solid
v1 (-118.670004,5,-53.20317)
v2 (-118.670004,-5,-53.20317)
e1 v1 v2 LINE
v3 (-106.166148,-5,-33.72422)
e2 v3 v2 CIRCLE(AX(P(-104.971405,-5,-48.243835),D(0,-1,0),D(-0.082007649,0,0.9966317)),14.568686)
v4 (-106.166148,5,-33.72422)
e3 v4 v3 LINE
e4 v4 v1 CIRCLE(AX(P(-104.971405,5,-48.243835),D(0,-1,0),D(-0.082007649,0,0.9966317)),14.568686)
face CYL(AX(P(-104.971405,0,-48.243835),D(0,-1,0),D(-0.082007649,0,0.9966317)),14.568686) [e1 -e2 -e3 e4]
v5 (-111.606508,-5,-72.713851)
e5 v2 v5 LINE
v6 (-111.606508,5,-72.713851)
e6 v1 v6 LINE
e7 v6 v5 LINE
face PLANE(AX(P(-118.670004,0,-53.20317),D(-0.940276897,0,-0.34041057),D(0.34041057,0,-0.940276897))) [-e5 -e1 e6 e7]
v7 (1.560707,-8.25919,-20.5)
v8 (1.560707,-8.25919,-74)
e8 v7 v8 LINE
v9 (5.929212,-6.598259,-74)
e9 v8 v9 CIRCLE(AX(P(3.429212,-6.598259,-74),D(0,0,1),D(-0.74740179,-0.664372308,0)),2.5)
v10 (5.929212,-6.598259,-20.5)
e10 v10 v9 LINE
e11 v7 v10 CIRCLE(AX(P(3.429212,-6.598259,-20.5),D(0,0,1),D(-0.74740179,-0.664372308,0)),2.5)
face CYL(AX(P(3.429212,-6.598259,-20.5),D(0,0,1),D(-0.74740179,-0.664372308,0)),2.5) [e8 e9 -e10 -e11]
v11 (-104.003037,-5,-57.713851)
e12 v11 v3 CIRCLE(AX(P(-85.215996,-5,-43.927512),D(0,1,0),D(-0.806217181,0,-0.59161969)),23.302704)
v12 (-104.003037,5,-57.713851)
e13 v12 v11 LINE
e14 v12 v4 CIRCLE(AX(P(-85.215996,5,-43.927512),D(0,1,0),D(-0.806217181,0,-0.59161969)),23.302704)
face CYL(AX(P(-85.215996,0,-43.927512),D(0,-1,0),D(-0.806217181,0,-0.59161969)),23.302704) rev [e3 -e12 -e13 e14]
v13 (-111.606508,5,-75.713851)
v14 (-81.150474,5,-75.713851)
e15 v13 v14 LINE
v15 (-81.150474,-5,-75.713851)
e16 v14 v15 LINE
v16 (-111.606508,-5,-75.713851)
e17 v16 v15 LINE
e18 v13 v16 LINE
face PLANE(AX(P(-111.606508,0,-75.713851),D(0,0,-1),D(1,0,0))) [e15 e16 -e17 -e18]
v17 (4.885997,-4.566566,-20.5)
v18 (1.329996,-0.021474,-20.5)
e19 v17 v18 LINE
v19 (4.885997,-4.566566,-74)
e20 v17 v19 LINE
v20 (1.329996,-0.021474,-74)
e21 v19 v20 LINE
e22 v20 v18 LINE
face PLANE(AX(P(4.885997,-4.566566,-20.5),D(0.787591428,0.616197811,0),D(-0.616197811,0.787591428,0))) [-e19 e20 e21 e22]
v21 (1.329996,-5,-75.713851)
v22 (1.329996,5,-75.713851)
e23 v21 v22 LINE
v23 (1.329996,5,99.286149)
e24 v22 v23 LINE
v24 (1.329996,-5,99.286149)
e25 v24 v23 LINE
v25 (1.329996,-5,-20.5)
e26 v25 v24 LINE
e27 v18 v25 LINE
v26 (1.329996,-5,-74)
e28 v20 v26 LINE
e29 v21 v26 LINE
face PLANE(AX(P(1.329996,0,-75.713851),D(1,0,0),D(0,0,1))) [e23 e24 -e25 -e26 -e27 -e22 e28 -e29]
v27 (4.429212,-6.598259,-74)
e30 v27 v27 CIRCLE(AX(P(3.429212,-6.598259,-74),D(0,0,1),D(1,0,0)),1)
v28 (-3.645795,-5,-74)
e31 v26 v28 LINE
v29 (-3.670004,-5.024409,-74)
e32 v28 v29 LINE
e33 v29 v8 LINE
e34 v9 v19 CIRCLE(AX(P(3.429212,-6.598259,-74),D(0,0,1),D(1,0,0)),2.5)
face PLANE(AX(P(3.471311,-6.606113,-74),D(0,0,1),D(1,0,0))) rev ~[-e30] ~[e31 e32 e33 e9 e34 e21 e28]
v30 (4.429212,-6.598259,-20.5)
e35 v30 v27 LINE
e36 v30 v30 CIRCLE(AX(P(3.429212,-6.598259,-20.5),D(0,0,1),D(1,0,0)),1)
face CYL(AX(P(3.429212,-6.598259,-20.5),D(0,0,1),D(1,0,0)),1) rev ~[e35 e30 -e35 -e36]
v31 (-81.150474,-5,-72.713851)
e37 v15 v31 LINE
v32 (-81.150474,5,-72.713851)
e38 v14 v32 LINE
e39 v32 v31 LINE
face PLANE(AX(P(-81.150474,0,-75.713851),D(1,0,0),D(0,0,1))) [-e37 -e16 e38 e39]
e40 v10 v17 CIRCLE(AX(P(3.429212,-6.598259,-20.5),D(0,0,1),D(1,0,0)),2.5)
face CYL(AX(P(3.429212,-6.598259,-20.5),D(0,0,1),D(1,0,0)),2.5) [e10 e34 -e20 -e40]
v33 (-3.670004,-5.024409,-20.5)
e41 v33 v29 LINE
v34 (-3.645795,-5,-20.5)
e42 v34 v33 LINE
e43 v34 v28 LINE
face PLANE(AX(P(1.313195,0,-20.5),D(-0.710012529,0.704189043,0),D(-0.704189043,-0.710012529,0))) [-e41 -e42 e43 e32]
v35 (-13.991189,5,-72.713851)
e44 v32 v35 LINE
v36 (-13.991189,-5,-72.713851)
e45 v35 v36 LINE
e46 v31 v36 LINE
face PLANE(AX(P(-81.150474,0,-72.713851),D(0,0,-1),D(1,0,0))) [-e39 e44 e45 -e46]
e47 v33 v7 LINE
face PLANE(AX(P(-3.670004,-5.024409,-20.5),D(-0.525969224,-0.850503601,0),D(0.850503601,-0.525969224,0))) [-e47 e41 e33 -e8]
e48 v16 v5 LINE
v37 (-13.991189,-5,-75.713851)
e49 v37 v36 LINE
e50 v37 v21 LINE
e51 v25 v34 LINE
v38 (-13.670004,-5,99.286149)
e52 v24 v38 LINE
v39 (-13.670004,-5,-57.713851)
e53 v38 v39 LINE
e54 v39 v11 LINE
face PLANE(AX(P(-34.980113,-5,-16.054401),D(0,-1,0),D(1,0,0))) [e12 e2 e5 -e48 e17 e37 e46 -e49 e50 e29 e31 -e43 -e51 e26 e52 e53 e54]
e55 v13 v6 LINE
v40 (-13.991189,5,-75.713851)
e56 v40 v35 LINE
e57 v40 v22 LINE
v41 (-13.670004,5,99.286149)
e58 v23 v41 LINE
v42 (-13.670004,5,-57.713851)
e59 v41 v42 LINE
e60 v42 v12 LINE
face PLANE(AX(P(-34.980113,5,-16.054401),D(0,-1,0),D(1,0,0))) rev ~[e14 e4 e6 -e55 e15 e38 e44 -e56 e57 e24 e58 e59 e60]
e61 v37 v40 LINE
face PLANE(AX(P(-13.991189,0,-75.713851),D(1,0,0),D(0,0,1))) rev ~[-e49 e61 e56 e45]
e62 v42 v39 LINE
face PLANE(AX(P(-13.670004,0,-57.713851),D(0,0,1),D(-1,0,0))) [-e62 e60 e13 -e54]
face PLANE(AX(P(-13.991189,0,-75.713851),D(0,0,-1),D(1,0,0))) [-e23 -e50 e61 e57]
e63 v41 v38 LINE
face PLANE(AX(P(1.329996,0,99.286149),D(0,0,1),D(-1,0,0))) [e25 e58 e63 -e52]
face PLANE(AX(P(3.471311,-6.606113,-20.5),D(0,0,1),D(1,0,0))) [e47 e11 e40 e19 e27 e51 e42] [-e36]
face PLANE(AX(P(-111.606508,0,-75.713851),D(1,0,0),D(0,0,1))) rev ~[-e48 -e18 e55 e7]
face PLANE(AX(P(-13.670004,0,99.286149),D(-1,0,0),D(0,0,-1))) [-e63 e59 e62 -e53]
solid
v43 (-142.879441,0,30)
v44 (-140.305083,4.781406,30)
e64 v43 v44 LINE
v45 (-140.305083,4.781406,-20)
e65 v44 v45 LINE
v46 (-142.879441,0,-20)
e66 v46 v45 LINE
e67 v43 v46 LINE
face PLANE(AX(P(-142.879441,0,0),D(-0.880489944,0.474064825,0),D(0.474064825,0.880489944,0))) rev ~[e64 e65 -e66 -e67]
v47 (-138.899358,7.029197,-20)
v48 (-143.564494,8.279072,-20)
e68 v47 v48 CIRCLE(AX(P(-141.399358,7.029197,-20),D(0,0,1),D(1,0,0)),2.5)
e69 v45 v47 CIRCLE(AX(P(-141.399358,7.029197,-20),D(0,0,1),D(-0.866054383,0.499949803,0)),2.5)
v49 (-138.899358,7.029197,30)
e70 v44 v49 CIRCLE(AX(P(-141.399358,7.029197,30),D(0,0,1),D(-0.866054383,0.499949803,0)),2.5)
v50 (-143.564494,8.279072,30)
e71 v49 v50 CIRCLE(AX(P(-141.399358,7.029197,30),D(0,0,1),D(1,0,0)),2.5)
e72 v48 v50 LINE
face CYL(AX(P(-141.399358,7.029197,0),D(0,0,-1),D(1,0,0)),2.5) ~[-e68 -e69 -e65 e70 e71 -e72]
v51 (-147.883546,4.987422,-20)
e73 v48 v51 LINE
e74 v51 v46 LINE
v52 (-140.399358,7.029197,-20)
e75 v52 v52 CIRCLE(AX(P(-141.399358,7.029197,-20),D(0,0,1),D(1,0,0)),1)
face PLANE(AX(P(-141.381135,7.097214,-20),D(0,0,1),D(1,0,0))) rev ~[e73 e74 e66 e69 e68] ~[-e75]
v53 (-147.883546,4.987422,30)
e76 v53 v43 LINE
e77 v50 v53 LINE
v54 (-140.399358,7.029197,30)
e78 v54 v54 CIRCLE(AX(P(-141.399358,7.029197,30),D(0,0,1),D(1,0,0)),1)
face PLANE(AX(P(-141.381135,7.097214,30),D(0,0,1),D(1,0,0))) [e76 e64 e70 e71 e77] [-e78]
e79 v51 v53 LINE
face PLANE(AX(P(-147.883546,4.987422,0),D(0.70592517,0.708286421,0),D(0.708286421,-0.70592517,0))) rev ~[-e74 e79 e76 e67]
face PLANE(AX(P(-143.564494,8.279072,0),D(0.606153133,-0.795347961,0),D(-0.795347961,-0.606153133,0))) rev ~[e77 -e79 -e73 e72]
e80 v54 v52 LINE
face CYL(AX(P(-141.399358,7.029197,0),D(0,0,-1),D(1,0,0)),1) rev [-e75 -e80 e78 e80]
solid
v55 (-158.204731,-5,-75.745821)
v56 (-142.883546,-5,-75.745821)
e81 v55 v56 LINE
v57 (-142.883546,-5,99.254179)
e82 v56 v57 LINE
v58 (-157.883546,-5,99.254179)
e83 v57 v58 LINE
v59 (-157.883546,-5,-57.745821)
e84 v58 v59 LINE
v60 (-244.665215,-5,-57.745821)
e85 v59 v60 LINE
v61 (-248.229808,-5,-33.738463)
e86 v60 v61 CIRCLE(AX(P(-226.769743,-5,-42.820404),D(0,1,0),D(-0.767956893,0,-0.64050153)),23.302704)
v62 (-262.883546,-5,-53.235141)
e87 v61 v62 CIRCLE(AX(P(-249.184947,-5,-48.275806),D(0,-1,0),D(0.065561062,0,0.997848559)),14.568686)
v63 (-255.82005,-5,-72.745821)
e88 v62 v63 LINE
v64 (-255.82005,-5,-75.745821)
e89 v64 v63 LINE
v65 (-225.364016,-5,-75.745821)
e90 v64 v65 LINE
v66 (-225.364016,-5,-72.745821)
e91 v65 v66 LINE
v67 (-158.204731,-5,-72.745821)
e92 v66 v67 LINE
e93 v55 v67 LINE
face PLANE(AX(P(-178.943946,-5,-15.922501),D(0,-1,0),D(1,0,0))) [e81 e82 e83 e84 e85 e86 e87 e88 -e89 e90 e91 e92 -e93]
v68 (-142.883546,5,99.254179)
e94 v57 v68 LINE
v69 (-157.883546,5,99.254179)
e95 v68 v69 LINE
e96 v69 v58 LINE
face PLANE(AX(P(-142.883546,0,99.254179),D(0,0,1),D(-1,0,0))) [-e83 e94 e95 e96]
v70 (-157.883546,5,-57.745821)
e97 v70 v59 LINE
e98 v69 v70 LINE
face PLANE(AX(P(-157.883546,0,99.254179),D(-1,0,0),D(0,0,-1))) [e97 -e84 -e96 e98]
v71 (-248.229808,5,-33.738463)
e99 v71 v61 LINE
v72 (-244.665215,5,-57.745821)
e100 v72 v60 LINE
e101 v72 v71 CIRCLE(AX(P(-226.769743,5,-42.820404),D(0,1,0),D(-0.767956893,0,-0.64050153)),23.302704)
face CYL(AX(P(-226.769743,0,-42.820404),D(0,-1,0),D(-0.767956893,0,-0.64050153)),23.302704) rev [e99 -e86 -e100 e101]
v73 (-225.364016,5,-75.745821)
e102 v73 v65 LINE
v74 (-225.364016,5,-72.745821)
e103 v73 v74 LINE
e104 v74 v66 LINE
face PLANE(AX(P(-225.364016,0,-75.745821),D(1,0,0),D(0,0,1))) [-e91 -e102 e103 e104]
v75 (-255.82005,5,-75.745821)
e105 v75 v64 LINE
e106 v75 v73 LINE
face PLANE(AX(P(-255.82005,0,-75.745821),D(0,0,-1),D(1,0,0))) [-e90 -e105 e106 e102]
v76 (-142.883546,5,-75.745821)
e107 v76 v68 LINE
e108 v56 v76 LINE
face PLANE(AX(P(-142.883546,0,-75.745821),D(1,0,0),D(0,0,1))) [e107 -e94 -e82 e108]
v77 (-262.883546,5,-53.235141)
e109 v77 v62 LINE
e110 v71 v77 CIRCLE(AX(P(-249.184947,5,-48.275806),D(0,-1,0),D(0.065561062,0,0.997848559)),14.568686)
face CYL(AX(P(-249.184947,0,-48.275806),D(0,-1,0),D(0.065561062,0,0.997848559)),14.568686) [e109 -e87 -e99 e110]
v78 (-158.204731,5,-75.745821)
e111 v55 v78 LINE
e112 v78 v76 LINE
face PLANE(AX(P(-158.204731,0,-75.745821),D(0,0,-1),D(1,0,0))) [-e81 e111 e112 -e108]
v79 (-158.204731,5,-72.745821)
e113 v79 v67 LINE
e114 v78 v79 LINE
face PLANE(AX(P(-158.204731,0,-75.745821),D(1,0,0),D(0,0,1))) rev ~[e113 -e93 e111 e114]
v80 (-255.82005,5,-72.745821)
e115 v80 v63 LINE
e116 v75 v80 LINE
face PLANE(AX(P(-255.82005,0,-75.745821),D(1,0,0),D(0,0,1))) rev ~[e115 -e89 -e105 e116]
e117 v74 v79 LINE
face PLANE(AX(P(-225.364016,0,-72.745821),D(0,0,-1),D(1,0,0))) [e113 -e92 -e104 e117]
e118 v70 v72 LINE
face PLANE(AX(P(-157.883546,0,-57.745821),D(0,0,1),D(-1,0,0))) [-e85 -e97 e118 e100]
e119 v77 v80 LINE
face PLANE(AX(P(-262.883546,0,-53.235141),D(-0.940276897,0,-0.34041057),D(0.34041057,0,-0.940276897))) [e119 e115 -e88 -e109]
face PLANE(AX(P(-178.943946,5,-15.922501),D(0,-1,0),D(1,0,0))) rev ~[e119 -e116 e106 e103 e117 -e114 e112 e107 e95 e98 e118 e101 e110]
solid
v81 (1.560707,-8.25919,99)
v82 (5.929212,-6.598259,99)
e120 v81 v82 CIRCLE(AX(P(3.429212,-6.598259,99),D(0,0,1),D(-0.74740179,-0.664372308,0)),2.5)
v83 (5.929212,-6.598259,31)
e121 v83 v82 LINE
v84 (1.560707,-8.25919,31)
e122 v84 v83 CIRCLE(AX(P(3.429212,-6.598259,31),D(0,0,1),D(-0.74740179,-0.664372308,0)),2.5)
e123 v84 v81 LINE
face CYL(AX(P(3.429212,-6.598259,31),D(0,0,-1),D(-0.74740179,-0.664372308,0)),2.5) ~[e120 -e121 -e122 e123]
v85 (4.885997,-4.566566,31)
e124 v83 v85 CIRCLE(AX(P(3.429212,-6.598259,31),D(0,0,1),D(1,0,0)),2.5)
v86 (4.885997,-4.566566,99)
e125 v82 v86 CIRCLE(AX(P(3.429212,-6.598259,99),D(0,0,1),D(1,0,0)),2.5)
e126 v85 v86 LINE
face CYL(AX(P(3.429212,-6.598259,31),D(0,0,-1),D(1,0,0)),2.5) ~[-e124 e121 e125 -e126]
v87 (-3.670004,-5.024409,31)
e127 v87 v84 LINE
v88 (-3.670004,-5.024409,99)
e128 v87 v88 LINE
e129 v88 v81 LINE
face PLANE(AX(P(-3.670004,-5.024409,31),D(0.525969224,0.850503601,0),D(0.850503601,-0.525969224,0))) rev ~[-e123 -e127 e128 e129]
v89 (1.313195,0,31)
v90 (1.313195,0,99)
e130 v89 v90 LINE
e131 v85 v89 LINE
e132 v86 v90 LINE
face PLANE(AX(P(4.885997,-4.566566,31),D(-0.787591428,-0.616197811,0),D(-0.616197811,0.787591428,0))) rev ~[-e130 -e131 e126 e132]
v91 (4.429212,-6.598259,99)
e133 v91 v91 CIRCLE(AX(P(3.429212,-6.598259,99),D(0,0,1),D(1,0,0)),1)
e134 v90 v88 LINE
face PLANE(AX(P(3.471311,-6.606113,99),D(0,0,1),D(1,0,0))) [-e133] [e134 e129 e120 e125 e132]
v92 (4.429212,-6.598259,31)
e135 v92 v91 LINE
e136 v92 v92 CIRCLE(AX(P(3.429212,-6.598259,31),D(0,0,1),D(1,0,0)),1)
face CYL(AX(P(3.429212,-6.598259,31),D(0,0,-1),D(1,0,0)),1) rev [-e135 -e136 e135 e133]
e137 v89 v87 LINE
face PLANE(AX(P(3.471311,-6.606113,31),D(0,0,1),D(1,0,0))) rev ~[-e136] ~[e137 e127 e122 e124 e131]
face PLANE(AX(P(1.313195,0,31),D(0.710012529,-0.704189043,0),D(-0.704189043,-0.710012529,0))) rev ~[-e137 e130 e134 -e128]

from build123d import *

# Parameters (mm, degrees)
F0_W          = 15.321185604
F0_H          = 3
F0_W_2        = 30.4560337395
F1_DEPTH      = 5
F2_R          = 1
F3_DEPTH      = 20
F3_DEPTH_BACK = 30
F4_START      = -20.5
F4_DEPTH      = 53.5
F5_START      = 31
F5_DEPTH      = 68


# Not quite as in the source:
# - a feature names something its author has since deleted; it is built from what else it names


with BuildPart() as f1:
    # F0 (on Front) → F1 (new body, symmetric)
    with BuildSketch(Plane.XZ):
        with BuildLine():
            Line((-142.8835457128, 99.2541786495), (-157.8835457128, 99.2541786495))
            Line((-157.8835457128, 99.2541786495), (-157.8835457128, -57.7458213505))
            Line((-157.8835457128, -57.7458213505), (-244.6652154244, -57.7458213505))
            ThreePointArc((-244.6652154244, -57.7458213505), (-249.819751502, -46.2428496856), (-248.2298080079, -33.7384632959))
            ThreePointArc((-248.2298080079, -33.7384632959), (-260.8309353496, -39.5226598893), (-262.8835457128, -53.2351407447))
            Line((-262.8835457128, -53.2351407447), (-255.8200499165, -72.7458213505))
            Line((-255.8200499165, -72.7458213505), (-225.3640161769, -72.7458213505))
            Line((-225.3640161769, -72.7458213505), (-158.2047313168, -72.7458213505))
            Line((-158.2047313168, -72.7458213505), (-142.8835457128, -72.7458213505))
            Line((-142.8835457128, -72.7458213505), (-142.8835457128, 99.2541786495))
        make_face()
        with Locations((-150.5441385148, -74.2458213505)):
            Rectangle(F0_W, F0_H)
        with Locations((-240.5920330467, -74.2458213505)):
            Rectangle(F0_W_2, F0_H)
    extrude(amount=F1_DEPTH, both=True)


with BuildPart() as f1b:
    # F0 (on Front) → F1, piece 2 (new body, symmetric)
    with BuildSketch(Plane.XZ):
        with BuildLine():
            Line((1.3299961225, 99.2861494968), (-13.6700038775, 99.2861494968))
            Line((-13.6700038775, 99.2861494968), (-13.6700038775, -57.7138505032))
            Line((-13.6700038775, -57.7138505032), (-104.0030368801, -57.7138505032))
            ThreePointArc((-104.0030368801, -57.7138505032), (-108.4245444734, -46.0201943036), (-106.1661484389, -33.7242204885))
            ThreePointArc((-106.1661484389, -33.7242204885), (-117.2315141427, -40.373870816), (-118.6700038775, -53.2031698974))
            Line((-118.6700038775, -53.2031698974), (-111.6065080813, -72.7138505032))
            Line((-111.6065080813, -72.7138505032), (-81.1504743417, -72.7138505032))
            Line((-81.1504743417, -72.7138505032), (-13.9911894815, -72.7138505032))
            Line((-13.9911894815, -72.7138505032), (1.3299961225, -72.7138505032))
            Line((1.3299961225, -72.7138505032), (1.3299961225, -2.6822620718))
            Line((1.3299961225, -2.6822620718), (1.3299961225, 31.9242632935))
            Line((1.3299961225, 31.9242632935), (1.3299961225, 99.2861494968))
        make_face()
        with Locations((-96.3784912115, -74.2138505032)):
            Rectangle(F0_W_2, F0_H)
        with Locations((-6.3305966795, -74.2138505032)):
            Rectangle(F0_W, F0_H)
    extrude(amount=F1_DEPTH, both=True)

    # F2 (on Top) → F4 (join)
    with BuildSketch(Plane.XY.offset(F4_START)):
        with BuildLine():
            ThreePointArc((1.5607074298, -8.2591902465), (4.3176765393, -8.9350586961), (5.9292119056, -6.598259476))
            ThreePointArc((5.9292119056, -6.598259476), (5.6531681475, -5.4563231231), (4.8859969983, -4.5665662921))
            ThreePointArc((4.8859969983, -4.5665662921), (1.5941978234, -4.9004010255), (1.5165762661, -8.2081740423))
            ThreePointArc((1.5165762661, -8.2081740423), (1.5384697746, -8.2338309951), (1.5607074298, -8.2591902465))
        make_face()
        with Locations((3.4292119056, -6.598259476)):
            Circle(F2_R, mode=Mode.SUBTRACT)
        with BuildLine():
            ThreePointArc((1.5165762661, -8.2081740423), (1.5941978234, -4.9004010255), (4.8859969983, -4.5665662921))
            Line((4.8859969983, -4.5665662921), (1.3131950982, 0))
            Line((1.3131950982, 0), (-3.6700038775, -5.0244089216))
            Line((-3.6700038775, -5.0244089216), (1.5165762661, -8.2081740423))
        make_face()
        with BuildLine():
            Line((-3.6700038775, -5.0244089216), (1.5607074298, -8.2591902465))
            ThreePointArc((1.5607074298, -8.2591902465), (1.5384697746, -8.2338309951), (1.5165762661, -8.2081740423))
            Line((1.5165762661, -8.2081740423), (-3.6700038775, -5.0244089216))
        make_face()
    extrude(amount=-F4_DEPTH)


with BuildPart() as f3:
    # F2 (on Top) → F3 (new body, two sides)
    with BuildSketch(Plane.XY) as f3_sk:
        with BuildLine():
            ThreePointArc((-140.3050830614, 4.7814064547), (-139.2797249014, 5.7036192761), (-138.8993577326, 7.0291971353))
            ThreePointArc((-138.8993577326, 7.0291971353), (-140.7523801028, 9.4440304518), (-143.5644936898, 8.2790716438))
            ThreePointArc((-143.5644936898, 8.2790716438), (-143.228319574, 5.3248208322), (-140.3050830614, 4.7814064547))
        make_face()
        with Locations((-141.3993577326, 7.0291971353)):
            Circle(F2_R, mode=Mode.SUBTRACT)
        with BuildLine():
            ThreePointArc((-140.3050830614, 4.7814064547), (-143.228319574, 5.3248208322), (-143.5644936898, 8.2790716438))
            Line((-143.5644936898, 8.2790716438), (-147.8835457128, 4.9874218958))
            Line((-147.8835457128, 4.9874218958), (-142.8794413805, 0))
            Line((-142.8794413805, 0), (-140.3050830614, 4.7814064547))
        make_face()
    extrude(amount=-F3_DEPTH)
    extrude(f3_sk.sketch, amount=F3_DEPTH_BACK)


with BuildPart() as f5:
    # F2 (on Top) → F5 (new body)
    with BuildSketch(Plane.XY.offset(F5_START)):
        with BuildLine():
            ThreePointArc((1.5607074298, -8.2591902465), (4.3176765393, -8.9350586961), (5.9292119056, -6.598259476))
            ThreePointArc((5.9292119056, -6.598259476), (5.6531681475, -5.4563231231), (4.8859969983, -4.5665662921))
            ThreePointArc((4.8859969983, -4.5665662921), (1.5941978234, -4.9004010255), (1.5165762661, -8.2081740423))
            ThreePointArc((1.5165762661, -8.2081740423), (1.5384697746, -8.2338309951), (1.5607074298, -8.2591902465))
        make_face()
        with Locations((3.4292119056, -6.598259476)):
            Circle(F2_R, mode=Mode.SUBTRACT)
        with BuildLine():
            ThreePointArc((1.5165762661, -8.2081740423), (1.5941978234, -4.9004010255), (4.8859969983, -4.5665662921))
            Line((4.8859969983, -4.5665662921), (1.3131950982, 0))
            Line((1.3131950982, 0), (-3.6700038775, -5.0244089216))
            Line((-3.6700038775, -5.0244089216), (1.5165762661, -8.2081740423))
        make_face()
        with BuildLine():
            Line((-3.6700038775, -5.0244089216), (1.5607074298, -8.2591902465))
            ThreePointArc((1.5607074298, -8.2591902465), (1.5384697746, -8.2338309951), (1.5165762661, -8.2081740423))
            Line((1.5165762661, -8.2081740423), (-3.6700038775, -5.0244089216))
        make_face()
    extrude(amount=F5_DEPTH)


solid = Compound([f1.part, f1b.part, f3.part, f5.part])
